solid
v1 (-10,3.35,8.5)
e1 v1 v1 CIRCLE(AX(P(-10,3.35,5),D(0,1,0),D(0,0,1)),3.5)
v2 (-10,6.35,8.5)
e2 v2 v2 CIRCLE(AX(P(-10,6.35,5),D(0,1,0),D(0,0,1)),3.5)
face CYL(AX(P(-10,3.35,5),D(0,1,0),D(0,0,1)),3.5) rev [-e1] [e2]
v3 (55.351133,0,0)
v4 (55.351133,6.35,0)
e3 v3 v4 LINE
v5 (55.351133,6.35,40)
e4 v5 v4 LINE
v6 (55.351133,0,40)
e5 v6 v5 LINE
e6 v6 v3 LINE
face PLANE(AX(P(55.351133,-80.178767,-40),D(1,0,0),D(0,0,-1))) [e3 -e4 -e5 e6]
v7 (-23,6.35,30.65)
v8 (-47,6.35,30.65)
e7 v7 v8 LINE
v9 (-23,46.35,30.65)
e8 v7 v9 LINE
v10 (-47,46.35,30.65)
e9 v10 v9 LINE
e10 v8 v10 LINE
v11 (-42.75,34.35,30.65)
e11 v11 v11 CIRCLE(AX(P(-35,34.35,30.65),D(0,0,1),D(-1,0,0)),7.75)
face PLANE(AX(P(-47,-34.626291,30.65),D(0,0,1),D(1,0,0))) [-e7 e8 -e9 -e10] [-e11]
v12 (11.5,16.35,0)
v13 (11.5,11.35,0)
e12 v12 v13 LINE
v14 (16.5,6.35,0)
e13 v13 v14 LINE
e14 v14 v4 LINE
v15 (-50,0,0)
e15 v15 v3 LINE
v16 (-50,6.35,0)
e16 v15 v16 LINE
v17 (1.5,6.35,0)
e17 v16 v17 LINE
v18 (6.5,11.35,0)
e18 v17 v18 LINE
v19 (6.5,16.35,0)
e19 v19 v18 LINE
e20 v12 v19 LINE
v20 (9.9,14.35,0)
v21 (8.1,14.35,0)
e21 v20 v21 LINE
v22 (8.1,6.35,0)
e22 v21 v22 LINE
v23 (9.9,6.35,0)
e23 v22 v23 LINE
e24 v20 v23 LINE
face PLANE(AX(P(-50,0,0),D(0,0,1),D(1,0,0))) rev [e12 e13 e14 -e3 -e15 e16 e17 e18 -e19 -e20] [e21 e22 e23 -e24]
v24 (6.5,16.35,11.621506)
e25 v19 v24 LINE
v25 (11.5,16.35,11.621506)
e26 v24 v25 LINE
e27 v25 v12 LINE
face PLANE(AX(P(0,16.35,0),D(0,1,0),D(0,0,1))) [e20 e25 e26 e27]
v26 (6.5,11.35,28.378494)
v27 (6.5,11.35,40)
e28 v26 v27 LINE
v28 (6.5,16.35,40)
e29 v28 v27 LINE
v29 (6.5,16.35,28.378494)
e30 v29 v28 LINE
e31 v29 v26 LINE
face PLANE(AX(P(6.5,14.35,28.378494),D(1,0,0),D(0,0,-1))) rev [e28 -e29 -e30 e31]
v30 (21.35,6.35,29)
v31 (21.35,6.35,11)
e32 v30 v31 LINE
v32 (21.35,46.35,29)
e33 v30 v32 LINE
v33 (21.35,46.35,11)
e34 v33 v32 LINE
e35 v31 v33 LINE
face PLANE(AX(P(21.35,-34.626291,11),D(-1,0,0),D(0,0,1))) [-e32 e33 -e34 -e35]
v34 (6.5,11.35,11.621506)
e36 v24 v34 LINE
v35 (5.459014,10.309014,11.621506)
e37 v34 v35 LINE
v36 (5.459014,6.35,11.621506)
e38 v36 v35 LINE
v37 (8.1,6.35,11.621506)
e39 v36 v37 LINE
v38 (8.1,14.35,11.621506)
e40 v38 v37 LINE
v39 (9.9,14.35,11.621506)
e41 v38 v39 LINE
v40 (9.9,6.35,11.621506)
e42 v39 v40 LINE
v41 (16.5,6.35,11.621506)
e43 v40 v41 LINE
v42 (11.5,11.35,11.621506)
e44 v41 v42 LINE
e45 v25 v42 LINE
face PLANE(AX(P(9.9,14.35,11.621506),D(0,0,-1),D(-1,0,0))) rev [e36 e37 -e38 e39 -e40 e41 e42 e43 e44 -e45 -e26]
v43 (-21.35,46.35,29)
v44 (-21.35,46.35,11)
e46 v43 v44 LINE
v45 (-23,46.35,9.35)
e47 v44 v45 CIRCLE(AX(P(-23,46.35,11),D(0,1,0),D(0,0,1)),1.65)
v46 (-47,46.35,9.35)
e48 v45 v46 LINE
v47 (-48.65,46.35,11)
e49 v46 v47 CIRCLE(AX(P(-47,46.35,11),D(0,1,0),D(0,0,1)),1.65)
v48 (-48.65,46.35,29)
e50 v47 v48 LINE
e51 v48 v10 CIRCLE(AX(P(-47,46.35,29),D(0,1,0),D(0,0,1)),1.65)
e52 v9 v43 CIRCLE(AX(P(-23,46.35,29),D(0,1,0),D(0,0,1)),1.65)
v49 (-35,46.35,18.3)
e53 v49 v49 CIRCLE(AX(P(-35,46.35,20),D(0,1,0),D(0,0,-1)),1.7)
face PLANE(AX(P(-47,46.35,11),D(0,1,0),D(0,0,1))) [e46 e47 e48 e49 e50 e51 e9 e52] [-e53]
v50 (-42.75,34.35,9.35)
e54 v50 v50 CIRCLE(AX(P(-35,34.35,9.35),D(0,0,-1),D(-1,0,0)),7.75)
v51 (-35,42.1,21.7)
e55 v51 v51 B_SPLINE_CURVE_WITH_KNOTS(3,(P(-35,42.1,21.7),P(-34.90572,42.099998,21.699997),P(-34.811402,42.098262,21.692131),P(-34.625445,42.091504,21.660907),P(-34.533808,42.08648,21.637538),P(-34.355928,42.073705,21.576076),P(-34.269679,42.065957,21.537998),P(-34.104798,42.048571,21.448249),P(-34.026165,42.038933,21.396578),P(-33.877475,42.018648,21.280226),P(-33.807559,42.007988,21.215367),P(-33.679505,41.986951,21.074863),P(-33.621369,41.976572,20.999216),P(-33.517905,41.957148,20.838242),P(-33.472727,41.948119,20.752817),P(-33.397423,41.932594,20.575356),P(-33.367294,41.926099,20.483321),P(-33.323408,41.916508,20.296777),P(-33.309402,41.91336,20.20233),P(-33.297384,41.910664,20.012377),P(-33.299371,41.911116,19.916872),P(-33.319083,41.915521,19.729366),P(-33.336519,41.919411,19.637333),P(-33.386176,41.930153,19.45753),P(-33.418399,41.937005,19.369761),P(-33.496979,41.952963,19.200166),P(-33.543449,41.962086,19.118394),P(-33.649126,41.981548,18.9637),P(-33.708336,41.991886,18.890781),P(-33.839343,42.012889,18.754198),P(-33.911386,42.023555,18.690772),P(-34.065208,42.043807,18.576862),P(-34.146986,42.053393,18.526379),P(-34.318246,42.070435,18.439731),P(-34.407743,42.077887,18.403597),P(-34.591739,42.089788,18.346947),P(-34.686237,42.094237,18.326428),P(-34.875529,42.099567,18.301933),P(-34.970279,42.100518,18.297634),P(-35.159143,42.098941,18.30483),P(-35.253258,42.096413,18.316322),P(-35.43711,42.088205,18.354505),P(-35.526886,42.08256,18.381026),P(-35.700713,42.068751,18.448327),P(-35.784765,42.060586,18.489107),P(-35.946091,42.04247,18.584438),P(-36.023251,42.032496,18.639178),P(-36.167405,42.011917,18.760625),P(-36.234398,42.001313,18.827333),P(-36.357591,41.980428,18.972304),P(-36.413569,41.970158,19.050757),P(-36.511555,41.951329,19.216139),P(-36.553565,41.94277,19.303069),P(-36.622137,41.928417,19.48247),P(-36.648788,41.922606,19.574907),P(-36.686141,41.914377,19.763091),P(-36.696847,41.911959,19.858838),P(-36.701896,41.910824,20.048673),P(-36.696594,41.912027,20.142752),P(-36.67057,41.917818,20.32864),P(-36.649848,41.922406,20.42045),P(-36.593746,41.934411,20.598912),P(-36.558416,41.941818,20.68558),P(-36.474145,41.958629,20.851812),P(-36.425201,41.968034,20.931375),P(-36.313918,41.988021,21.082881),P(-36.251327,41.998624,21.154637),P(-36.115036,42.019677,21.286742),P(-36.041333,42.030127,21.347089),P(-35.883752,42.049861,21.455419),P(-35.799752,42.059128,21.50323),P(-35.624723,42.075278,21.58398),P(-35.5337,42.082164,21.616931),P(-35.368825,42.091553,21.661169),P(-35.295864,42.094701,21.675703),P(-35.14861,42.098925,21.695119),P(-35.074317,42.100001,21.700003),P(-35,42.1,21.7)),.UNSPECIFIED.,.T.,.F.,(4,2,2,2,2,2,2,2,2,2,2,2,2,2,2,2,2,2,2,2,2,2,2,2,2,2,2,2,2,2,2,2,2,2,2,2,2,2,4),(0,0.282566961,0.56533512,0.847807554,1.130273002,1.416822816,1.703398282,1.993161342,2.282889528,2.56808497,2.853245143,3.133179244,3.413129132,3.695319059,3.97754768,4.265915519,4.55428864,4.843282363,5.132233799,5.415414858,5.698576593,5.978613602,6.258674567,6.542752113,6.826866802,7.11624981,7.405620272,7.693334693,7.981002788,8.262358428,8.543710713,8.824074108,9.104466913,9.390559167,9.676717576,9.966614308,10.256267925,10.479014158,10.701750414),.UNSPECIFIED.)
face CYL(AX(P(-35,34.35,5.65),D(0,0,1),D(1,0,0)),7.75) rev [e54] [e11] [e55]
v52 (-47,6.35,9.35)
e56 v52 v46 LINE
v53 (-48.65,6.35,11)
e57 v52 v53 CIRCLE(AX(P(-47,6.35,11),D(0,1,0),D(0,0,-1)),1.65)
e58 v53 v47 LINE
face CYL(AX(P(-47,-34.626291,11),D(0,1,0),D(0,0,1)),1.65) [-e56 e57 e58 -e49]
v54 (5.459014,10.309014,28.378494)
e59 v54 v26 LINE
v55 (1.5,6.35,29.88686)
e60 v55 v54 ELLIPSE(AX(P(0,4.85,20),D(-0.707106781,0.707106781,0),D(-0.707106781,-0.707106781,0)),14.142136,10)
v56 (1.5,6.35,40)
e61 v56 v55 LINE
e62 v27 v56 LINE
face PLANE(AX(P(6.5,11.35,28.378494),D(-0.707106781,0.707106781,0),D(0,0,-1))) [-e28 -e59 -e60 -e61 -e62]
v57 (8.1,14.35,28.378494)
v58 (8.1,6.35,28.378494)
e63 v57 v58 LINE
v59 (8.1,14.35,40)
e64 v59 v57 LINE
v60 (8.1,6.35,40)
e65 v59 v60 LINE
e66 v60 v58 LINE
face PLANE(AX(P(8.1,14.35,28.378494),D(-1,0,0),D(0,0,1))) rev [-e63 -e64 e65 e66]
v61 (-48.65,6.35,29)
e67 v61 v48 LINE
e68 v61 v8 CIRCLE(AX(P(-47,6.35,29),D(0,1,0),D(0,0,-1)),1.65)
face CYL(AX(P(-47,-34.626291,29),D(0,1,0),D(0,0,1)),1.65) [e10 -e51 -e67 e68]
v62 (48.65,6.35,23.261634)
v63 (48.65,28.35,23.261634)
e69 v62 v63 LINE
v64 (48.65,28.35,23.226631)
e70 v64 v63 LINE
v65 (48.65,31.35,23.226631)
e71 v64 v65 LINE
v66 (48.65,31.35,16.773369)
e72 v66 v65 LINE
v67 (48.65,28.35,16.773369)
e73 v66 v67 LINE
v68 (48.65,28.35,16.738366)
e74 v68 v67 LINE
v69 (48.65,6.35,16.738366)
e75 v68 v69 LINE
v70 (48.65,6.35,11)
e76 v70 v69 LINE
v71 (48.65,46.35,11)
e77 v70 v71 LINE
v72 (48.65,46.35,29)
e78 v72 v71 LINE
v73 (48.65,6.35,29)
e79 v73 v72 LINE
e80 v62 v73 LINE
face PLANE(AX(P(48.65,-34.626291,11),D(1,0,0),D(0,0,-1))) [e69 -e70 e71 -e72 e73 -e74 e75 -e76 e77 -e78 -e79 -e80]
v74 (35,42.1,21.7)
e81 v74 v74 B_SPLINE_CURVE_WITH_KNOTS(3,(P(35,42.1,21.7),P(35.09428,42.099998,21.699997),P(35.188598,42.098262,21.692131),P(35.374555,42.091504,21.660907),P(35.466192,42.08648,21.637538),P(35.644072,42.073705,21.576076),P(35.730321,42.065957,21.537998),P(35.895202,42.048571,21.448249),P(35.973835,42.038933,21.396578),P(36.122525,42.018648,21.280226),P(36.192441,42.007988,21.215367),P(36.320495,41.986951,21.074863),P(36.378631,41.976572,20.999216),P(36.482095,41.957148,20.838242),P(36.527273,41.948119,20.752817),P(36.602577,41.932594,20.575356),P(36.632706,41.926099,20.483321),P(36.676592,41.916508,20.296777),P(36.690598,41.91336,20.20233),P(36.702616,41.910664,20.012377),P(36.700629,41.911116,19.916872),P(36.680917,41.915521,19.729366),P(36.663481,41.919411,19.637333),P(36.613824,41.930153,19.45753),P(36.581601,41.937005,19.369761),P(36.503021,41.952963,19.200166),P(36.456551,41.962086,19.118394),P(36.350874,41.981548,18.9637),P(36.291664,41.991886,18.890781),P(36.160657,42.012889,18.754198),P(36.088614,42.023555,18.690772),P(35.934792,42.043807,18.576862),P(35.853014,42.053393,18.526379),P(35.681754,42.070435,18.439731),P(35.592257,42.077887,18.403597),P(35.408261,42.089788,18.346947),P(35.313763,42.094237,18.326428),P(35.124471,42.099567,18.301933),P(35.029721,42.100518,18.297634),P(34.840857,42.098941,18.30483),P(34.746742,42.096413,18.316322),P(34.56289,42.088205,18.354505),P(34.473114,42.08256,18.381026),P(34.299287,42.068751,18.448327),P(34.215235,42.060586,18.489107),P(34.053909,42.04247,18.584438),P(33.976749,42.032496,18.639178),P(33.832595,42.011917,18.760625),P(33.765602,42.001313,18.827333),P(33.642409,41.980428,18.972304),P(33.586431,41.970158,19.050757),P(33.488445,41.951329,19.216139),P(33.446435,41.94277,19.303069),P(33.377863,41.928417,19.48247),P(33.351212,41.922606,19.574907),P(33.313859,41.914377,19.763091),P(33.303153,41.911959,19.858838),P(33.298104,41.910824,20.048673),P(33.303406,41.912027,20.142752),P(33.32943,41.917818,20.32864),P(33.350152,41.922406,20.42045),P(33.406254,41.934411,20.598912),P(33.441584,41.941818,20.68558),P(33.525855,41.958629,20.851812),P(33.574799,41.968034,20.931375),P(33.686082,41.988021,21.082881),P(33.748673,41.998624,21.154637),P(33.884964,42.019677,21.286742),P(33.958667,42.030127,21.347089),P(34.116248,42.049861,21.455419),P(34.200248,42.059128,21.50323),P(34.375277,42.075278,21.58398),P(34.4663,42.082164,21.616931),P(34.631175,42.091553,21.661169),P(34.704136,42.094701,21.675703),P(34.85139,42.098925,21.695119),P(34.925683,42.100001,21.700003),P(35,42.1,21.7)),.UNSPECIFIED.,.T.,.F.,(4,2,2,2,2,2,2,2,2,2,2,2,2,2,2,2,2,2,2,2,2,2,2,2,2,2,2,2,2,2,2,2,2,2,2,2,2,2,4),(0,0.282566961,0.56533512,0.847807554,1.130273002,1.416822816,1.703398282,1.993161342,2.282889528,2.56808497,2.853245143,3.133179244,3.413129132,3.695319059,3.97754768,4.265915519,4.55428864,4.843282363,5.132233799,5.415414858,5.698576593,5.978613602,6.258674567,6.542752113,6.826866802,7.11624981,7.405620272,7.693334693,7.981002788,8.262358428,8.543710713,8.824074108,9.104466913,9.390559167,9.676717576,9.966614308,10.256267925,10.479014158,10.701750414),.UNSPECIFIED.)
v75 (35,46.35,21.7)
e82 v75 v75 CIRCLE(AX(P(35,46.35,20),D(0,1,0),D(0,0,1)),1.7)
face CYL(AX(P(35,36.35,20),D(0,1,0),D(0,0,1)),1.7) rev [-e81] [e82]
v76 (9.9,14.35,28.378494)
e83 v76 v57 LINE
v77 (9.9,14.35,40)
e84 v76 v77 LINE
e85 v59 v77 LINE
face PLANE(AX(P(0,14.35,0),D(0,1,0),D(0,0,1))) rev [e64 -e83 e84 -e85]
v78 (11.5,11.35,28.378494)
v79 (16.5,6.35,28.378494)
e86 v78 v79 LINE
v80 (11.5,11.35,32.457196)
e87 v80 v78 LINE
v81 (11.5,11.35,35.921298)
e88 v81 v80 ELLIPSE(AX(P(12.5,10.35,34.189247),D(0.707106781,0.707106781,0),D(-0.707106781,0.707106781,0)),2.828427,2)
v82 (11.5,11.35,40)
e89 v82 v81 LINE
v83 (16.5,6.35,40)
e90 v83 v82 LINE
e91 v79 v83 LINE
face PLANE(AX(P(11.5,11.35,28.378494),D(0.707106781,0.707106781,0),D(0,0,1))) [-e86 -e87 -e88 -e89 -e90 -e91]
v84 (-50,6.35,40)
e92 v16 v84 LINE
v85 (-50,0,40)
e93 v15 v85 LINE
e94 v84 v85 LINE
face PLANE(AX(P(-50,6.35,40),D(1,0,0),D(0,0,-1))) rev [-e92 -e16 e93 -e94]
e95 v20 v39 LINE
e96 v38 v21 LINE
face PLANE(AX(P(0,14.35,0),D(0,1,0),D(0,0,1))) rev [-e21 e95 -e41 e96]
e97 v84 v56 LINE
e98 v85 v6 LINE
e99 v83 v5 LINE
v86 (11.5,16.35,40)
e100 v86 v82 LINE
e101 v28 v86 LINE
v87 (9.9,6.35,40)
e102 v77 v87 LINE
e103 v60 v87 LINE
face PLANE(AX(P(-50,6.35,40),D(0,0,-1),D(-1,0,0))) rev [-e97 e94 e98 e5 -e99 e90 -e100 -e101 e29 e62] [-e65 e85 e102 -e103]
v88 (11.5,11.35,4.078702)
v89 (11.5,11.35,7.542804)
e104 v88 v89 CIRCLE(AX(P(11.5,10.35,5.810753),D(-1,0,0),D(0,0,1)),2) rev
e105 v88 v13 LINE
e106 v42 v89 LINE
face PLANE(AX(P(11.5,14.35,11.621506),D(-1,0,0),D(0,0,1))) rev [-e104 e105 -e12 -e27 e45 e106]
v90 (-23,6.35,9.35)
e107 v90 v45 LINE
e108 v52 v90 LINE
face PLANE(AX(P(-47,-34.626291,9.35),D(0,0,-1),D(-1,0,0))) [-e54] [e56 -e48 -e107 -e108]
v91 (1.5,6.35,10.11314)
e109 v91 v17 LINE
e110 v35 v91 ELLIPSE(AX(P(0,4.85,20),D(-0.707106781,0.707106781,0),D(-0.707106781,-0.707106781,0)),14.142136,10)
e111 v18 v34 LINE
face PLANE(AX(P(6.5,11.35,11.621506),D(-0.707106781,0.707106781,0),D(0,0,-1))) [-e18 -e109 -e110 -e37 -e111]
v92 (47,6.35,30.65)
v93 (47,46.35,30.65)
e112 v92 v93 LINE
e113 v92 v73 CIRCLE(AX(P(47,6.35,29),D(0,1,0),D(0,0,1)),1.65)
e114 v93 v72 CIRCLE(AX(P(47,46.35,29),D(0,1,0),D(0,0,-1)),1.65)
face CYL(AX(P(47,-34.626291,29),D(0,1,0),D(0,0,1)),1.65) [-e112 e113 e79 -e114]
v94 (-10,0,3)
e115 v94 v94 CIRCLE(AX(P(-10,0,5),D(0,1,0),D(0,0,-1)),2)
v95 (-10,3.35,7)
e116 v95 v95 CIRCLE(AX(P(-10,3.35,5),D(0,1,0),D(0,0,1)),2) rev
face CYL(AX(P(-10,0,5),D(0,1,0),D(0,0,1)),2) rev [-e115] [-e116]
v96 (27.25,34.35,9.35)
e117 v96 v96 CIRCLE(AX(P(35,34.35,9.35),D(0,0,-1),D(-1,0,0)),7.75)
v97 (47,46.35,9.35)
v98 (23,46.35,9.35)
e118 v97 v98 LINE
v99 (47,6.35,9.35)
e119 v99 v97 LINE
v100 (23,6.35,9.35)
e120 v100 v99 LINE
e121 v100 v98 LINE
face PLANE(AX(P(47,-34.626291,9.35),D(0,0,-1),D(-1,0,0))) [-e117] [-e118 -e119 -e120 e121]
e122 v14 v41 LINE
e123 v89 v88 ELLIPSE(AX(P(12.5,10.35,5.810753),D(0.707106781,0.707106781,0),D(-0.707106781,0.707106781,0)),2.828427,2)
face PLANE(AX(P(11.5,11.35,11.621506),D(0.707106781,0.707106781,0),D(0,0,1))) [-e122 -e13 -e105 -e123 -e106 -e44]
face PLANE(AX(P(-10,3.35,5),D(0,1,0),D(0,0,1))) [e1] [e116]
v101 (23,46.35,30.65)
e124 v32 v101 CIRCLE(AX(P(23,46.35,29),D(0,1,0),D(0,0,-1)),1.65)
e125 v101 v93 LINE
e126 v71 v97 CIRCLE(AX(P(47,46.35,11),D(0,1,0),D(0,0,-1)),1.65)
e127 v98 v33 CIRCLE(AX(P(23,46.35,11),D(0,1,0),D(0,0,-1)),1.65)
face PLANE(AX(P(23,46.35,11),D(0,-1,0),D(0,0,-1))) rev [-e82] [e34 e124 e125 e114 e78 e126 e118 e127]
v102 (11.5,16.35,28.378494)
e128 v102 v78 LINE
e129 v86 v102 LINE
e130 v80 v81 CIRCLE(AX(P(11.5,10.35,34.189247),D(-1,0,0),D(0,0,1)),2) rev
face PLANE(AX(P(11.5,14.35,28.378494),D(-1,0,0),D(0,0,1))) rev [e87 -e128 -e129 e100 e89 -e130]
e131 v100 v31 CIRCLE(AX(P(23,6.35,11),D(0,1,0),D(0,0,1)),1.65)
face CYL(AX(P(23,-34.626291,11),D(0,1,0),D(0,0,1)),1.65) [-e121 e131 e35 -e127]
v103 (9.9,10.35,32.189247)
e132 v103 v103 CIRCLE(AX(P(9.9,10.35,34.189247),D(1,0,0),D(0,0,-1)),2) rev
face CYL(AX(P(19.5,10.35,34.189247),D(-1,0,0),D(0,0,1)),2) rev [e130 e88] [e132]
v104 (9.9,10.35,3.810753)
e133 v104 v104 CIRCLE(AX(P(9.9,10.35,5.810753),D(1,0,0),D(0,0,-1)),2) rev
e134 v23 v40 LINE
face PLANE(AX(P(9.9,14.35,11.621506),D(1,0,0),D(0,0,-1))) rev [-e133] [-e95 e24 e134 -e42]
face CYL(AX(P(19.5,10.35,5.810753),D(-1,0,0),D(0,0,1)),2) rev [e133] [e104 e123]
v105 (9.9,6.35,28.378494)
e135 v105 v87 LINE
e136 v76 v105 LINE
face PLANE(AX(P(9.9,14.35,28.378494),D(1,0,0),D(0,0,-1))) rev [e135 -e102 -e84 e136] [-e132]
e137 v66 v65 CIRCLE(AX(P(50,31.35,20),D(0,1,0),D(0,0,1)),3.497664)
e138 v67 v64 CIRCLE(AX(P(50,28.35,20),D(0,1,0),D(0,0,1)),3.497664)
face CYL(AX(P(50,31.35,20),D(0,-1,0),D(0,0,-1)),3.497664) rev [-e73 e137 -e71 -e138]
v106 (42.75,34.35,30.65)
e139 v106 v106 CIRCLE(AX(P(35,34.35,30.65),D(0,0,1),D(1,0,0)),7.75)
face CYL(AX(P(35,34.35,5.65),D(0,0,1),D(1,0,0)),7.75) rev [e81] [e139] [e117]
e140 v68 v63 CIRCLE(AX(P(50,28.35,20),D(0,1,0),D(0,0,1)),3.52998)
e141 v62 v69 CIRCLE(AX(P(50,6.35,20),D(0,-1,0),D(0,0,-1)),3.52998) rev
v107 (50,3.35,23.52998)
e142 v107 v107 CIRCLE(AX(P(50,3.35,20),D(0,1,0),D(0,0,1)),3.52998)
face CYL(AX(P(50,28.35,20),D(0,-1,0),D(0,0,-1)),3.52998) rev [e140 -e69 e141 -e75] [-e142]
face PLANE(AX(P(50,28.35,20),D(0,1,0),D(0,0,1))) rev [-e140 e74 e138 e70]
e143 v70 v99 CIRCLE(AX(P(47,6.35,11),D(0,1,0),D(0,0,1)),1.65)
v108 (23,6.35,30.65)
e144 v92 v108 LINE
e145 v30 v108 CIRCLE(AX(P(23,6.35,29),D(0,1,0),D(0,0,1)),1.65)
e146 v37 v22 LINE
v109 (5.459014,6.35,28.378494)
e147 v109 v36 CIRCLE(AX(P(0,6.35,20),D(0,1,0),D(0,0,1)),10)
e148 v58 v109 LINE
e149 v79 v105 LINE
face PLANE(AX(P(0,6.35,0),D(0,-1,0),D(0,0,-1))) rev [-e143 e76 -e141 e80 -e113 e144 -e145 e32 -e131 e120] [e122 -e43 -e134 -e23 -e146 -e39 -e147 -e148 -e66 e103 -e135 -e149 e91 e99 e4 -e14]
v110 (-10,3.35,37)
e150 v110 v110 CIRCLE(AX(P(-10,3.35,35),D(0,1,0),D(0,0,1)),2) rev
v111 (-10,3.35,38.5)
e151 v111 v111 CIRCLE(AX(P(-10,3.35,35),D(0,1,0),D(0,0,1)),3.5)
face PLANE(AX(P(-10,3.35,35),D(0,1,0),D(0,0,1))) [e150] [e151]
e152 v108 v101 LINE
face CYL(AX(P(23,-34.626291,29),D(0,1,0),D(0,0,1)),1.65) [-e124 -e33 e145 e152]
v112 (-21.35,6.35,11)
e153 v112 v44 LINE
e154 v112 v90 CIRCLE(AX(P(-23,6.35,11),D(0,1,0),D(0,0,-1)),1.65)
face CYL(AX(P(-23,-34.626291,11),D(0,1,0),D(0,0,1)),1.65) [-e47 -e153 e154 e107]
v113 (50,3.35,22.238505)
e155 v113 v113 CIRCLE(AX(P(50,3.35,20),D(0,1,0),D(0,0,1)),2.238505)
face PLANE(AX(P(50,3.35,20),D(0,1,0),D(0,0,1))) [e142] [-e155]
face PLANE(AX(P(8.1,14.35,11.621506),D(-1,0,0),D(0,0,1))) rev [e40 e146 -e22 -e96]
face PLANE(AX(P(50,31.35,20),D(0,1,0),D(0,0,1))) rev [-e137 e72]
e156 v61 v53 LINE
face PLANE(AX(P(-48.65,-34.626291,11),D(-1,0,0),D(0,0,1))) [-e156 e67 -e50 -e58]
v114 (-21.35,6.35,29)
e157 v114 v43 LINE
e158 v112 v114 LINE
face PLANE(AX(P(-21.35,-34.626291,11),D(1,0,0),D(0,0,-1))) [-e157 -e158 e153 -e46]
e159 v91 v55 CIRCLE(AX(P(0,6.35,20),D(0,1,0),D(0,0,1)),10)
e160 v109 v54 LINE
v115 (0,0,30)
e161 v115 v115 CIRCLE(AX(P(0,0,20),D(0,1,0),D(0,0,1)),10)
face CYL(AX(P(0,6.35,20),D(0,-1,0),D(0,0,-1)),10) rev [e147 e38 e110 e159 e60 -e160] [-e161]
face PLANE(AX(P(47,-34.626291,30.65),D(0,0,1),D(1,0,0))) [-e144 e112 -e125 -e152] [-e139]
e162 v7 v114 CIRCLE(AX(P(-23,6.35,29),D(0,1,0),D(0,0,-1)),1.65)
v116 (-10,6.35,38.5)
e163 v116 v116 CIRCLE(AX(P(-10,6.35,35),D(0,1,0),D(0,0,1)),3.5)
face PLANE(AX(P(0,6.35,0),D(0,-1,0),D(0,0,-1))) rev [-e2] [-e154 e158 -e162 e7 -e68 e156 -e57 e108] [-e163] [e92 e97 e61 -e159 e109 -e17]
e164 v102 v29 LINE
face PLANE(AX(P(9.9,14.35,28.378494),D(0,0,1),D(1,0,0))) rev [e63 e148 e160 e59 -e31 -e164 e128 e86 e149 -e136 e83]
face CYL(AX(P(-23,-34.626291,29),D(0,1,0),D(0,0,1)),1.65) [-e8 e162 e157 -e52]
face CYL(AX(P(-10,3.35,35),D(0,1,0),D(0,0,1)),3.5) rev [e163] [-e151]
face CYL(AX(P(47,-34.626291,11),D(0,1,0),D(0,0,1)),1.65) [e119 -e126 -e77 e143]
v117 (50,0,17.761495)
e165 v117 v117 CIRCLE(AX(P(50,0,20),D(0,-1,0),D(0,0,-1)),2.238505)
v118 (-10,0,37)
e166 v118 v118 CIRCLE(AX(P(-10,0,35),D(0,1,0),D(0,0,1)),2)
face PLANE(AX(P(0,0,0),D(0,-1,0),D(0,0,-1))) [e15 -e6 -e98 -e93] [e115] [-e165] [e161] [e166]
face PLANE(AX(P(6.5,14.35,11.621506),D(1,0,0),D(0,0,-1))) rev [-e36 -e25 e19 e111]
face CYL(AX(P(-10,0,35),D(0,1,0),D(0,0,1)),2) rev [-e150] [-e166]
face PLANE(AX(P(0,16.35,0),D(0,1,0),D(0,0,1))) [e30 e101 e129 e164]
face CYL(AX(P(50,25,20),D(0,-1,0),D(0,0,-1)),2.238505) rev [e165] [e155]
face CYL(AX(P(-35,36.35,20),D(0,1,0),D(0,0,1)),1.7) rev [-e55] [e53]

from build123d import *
from build123d.topology import SkipClean

# Parameters (mm, degrees)
SKETCH1_W                = 100
SKETCH1_H                = 80
SKETCH1_R                = 10
SKETCH1_R_2              = 1.65
BOSS_EXTRUDE1_DEPTH      = 6.35
SKETCH3_R                = 2
CUT_EXTRUDE5_DEPTH       = 65.345337826
BOSS_EXTRUDE2_DEPTH      = 6.35
SKETCH6_W                = 105.351133128
SKETCH6_H                = 40
CUT_EXTRUDE6_DEPTH       = 69.586226304
SKETCH7_R                = 3.5
CUT_EXTRUDE7_DEPTH       = 3
BOSS_EXTRUDE4_START      = -6.35
BOSS_EXTRUDE4_DEPTH      = 46.35
SKETCH9_R                = 3.497663505
CUT_EXTRUDE8_DEPTH       = 25
CUT_EXTRUDE9_START       = 25
SKETCH10_R               = 3.529979832
SKETCH10_R_2             = 2
CUT_EXTRUDE9_DEPTH       = 25
SKETCH12_R               = 2.238504643
CUT_EXTRUDE10_DEPTH      = 25
SKETCH13_R               = 7.75
CUT_EXTRUDE11_DEPTH      = 25
SKETCH14_R               = 1.7
CUT_EXTRUDE12_DEPTH      = 10
SKETCH16_W               = 1.6
SKETCH16_H               = 11.621506057
BOSS_EXTRUDE5_DEPTH      = 8
CHAMFER1_SIZE            = 5
CHAMFER2_SIZE            = 5
CUT_EXTRUDE13_DEPTH      = 8
CUT_EXTRUDE13_DEPTH_BACK = 1.6
SKETCH17_R               = 2
SKETCH18_W               = 5
SKETCH18_H               = 11.621506057
BOSS_EXTRUDE6_DEPTH      = 2


with BuildPart() as part:
    # Sketch1 → Boss-Extrude1 (new body)
    with BuildSketch(Plane(origin=(0, 0, 0), x_dir=(1, 0, 0), z_dir=(0, 1, 0))):
        Rectangle(SKETCH1_W, SKETCH1_H)
        with Locations(Location((0, -20, 0), (0, 0, 270))):
            Circle(SKETCH1_R, mode=Mode.SUBTRACT)
        with Locations(Location((23, -29, 0), (0, 0, 270))):
            Circle(SKETCH1_R_2, mode=Mode.SUBTRACT)
        with Locations(Location((47, -11, 0), (0, 0, 270))):
            Circle(SKETCH1_R_2, mode=Mode.SUBTRACT)
        with Locations(Location((23, -11, 0), (0, 0, 270))):
            Circle(SKETCH1_R_2, mode=Mode.SUBTRACT)
        with Locations(Location((47, -29, 0), (0, 0, 270))):
            Circle(SKETCH1_R_2, mode=Mode.SUBTRACT)
        with Locations(Location((-23, -29, 0), (0, 0, 90))):
            Circle(SKETCH1_R_2, mode=Mode.SUBTRACT)
        with Locations(Location((-47, -29, 0), (0, 0, 90))):
            Circle(SKETCH1_R_2, mode=Mode.SUBTRACT)
        with Locations(Location((-47, -11, 0), (0, 0, 90))):
            Circle(SKETCH1_R_2, mode=Mode.SUBTRACT)
        with Locations(Location((-23, -11, 0), (0, 0, 90))):
            Circle(SKETCH1_R_2, mode=Mode.SUBTRACT)
    extrude(amount=BOSS_EXTRUDE1_DEPTH)

    # Sketch3 → Cut-Extrude5 (cut, through all)
    with BuildSketch(Plane(origin=(0, 6.35, 0), x_dir=(1, 0, 0), z_dir=(0, 1, 0))):
        with Locations((50, -20)):
            Circle(SKETCH3_R)
        with Locations(Location((-10, -35, 0), (0, 0, 270))):
            Circle(SKETCH3_R)
        with Locations(Location((-10, -5, 0), (0, 0, 90))):
            Circle(SKETCH3_R)
    extrude(amount=-CUT_EXTRUDE5_DEPTH, mode=Mode.SUBTRACT)

    # Sketch5 → Boss-Extrude2 (add)
    with SkipClean():  # the faces are left unmerged after this step: merging them gives an invalid solid
        with BuildSketch(Plane(origin=(0, 6.35, 0), x_dir=(1, 0, 0), z_dir=(0, 1, 0))):
            with BuildLine():
                Line((50, -22), (50, -40))
                Line((50, -40), (55.351133128, -40))
                Line((55.351133128, -40), (55.351133128, 40))
                Line((55.351133128, 40), (50, 40))
                Line((50, 40), (50, -18))
                ThreePointArc((50, -18), (52, -20), (50, -22))
            make_face()
        extrude(amount=-BOSS_EXTRUDE2_DEPTH)

    # Sketch6 → Cut-Extrude6 (cut, through all)
    with SkipClean():  # the faces are left unmerged after this step: merging them gives an invalid solid
        with BuildSketch(Plane(origin=(0, 6.35, 0), x_dir=(1, 0, 0), z_dir=(0, 1, 0))):
            with Locations((2.675566564, 20)):
                Rectangle(SKETCH6_W, SKETCH6_H)
        extrude(amount=-CUT_EXTRUDE6_DEPTH, mode=Mode.SUBTRACT)

    # Sketch7 → Cut-Extrude7 (cut)
    with SkipClean():  # the faces are left unmerged after this step: merging them gives an invalid solid
        with BuildSketch(Plane(origin=(0, 6.35, 0), x_dir=(1, 0, 0), z_dir=(0, 1, 0))):
            with Locations(Location((-10, -5, 0), (0, 0, 270))):
                Circle(SKETCH7_R)
            with Locations(Location((-10, -35, 0), (0, 0, 270))):
                Circle(SKETCH7_R)
            with Locations(Location((50, -20, 0), (0, 0, 270))):
                Circle(SKETCH7_R)
        extrude(amount=-CUT_EXTRUDE7_DEPTH, mode=Mode.SUBTRACT)

    # Sketch8 → Boss-Extrude4 (add)
    with BuildSketch(Plane(origin=(0, 6.35, 0), x_dir=(1, 0, 0), z_dir=(0, 1, 0)).offset(BOSS_EXTRUDE4_START)):
        with BuildLine():
            Line((-47, -9.35), (-23, -9.35))
            ThreePointArc((-23, -9.35), (-21.833273811, -9.833273811), (-21.35, -11))
            Line((-21.35, -11), (-21.35, -29))
            ThreePointArc((-21.35, -29), (-21.833273811, -30.166726189), (-23, -30.65))
            Line((-23, -30.65), (-47, -30.65))
            ThreePointArc((-47, -30.65), (-48.166726189, -30.166726189), (-48.65, -29))
            Line((-48.65, -29), (-48.65, -11))
            ThreePointArc((-48.65, -11), (-48.166726189, -9.833273811), (-47, -9.35))
        make_face()
        with BuildLine():
            Line((21.35, -11), (21.35, -29))
            ThreePointArc((21.35, -29), (21.833273811, -30.166726189), (23, -30.65))
            Line((23, -30.65), (47, -30.65))
            ThreePointArc((47, -30.65), (48.166726189, -30.166726189), (48.65, -29))
            Line((48.65, -29), (48.65, -11))
            ThreePointArc((48.65, -11), (48.166726189, -9.833273811), (47, -9.35))
            Line((47, -9.35), (23, -9.35))
            ThreePointArc((23, -9.35), (21.833273811, -9.833273811), (21.35, -11))
        make_face()
    extrude(amount=BOSS_EXTRUDE4_DEPTH)

    # Sketch9 → Cut-Extrude8 (cut)
    with BuildSketch(Plane(origin=(0, 6.35, 0), x_dir=(1, 0, 0), z_dir=(0, 1, 0))):
        with Locations((50, -20)):
            Circle(SKETCH9_R)
    extrude(amount=CUT_EXTRUDE8_DEPTH, mode=Mode.SUBTRACT)

    # Sketch10 → Cut-Extrude9 (cut)
    with BuildSketch(Plane(origin=(0, 3.35, 0), x_dir=(1, 0, 0), z_dir=(0, 1, 0)).offset(CUT_EXTRUDE9_START)):
        with Locations(Location((50, -20, 0), (0, 0, 112.484807611))):
            Circle(SKETCH10_R)
        with Locations((50, -20)):
            Circle(SKETCH10_R_2, mode=Mode.SUBTRACT)
    extrude(amount=-CUT_EXTRUDE9_DEPTH, mode=Mode.SUBTRACT)

    # Sketch12 → Cut-Extrude10 (cut)
    with BuildSketch(Plane.XZ):
        with Locations(Location((50, 20, 0), (0, 0, 270))):
            Circle(SKETCH12_R)
    extrude(amount=-CUT_EXTRUDE10_DEPTH, mode=Mode.SUBTRACT)

    # Sketch13 → Cut-Extrude11 (cut)
    with BuildSketch(Plane.XY.offset(30.65)):
        with Locations((35, 34.35)):
            Circle(SKETCH13_R)
        with Locations(Location((-35, 34.35, 0), (0, 0, 180))):
            Circle(SKETCH13_R)
    extrude(amount=-CUT_EXTRUDE11_DEPTH, mode=Mode.SUBTRACT)

    # Sketch14 → Cut-Extrude12 (cut)
    with BuildSketch(Plane(origin=(0, 46.35, 0), x_dir=(1, 0, 0), z_dir=(0, 1, 0))):
        with Locations(Location((35, -20, 0), (0, 0, 270))):
            Circle(SKETCH14_R)
        with Locations(Location((-35, -20, 0), (0, 0, 270))):
            Circle(SKETCH14_R)
    extrude(amount=-CUT_EXTRUDE12_DEPTH, mode=Mode.SUBTRACT)

    # Sketch16 → Boss-Extrude5 (add)
    with BuildSketch(Plane(origin=(0, 6.35, 0), x_dir=(1, 0, 0), z_dir=(0, 1, 0))):
        with Locations((10.7, -34.189246971)):
            Rectangle(SKETCH16_W, SKETCH16_H)
        with Locations((7.3, -5.810753029)):
            Rectangle(SKETCH16_W, SKETCH16_H)
        with Locations((10.7, -5.810753029)):
            Rectangle(SKETCH16_W, SKETCH16_H)
        with Locations((7.3, -34.189246971)):
            Rectangle(SKETCH16_W, SKETCH16_H)
    extrude(amount=BOSS_EXTRUDE5_DEPTH)

    # Chamfer1
    chamfer1_edges = [part.edges().sort_by_distance(p)[0] for p in [
        (11.5, 6.35, 5.810753029),
        (11.5, 6.35, 34.189246971),
    ]]
    chamfer(chamfer1_edges, length=CHAMFER1_SIZE)

    # Chamfer2
    # the kernel refuses this chamfer: 5 mm, written as the material it adds along each edge
    with BuildSketch(Plane(origin=(6.5, 6.35, 0), x_dir=(0.027495876610586317, 0.9996219169112968, 0), z_dir=(0, 0, 1))) as chamfer2_piece_1_section:
        Polygon((CHAMFER2_SIZE * 0.999621916911, CHAMFER2_SIZE * 0.0274958766106), (-CHAMFER2_SIZE * 0.0274958766106, CHAMFER2_SIZE * 0.999621916911), (0, 0), align=None)
    chamfer2_piece_1 = extrude(amount=11.621506057, mode=Mode.PRIVATE)
    chamfer2_piece_1 = chamfer2_piece_1 - Plane(origin=(0, 8.026002071, 20), x_dir=(0, 0, 1), z_dir=(0, -1, 0)) * Cylinder(10, 44, mode=Mode.PRIVATE)
    add(chamfer2_piece_1)
    with BuildSketch(Plane(origin=(6.5, 6.35, 28.378493943), x_dir=(0.027495876610586317, 0.9996219169112968, 0), z_dir=(0, 0, 1))) as chamfer2_piece_2_section:
        Polygon((CHAMFER2_SIZE * 0.999621916911, CHAMFER2_SIZE * 0.0274958766106), (-CHAMFER2_SIZE * 0.0274958766106, CHAMFER2_SIZE * 0.999621916911), (0, 0), align=None)
    chamfer2_piece_2 = extrude(amount=11.621506057, mode=Mode.PRIVATE)
    chamfer2_piece_2 = chamfer2_piece_2 - Plane(origin=(0, 8.026002093, 20), x_dir=(0, 0, 1), z_dir=(0, -1, 0)) * Cylinder(10, 44, mode=Mode.PRIVATE)
    add(chamfer2_piece_2)

    # Sketch17 → Cut-Extrude13 (cut, two sides: drawn at the far end of the back side and taken through both)
    with BuildSketch(Plane(origin=(11.5, 0, 0), x_dir=(0, 0, -1), z_dir=(1, 0, 0)).offset(-CUT_EXTRUDE13_DEPTH_BACK)):
        with Locations(Location((-5.810753029, 10.35, 0), (0, 0, 150))):
            Circle(SKETCH17_R)
        with Locations(Location((-34.189246971, 10.35, 0), (0, 0, 150))):
            Circle(SKETCH17_R)
    extrude(amount=CUT_EXTRUDE13_DEPTH + CUT_EXTRUDE13_DEPTH_BACK, mode=Mode.SUBTRACT)

    # Sketch18 → Boss-Extrude6 (add)
    with BuildSketch(Plane(origin=(0, 14.35, 0), x_dir=(1, 0, 0), z_dir=(0, 1, 0))):
        with Locations((9, -5.810753029)):
            Rectangle(SKETCH18_W, SKETCH18_H)
        with Locations((9, -34.189246971)):
            Rectangle(SKETCH18_W, SKETCH18_H)
    extrude(amount=BOSS_EXTRUDE6_DEPTH)


solid = part.part
